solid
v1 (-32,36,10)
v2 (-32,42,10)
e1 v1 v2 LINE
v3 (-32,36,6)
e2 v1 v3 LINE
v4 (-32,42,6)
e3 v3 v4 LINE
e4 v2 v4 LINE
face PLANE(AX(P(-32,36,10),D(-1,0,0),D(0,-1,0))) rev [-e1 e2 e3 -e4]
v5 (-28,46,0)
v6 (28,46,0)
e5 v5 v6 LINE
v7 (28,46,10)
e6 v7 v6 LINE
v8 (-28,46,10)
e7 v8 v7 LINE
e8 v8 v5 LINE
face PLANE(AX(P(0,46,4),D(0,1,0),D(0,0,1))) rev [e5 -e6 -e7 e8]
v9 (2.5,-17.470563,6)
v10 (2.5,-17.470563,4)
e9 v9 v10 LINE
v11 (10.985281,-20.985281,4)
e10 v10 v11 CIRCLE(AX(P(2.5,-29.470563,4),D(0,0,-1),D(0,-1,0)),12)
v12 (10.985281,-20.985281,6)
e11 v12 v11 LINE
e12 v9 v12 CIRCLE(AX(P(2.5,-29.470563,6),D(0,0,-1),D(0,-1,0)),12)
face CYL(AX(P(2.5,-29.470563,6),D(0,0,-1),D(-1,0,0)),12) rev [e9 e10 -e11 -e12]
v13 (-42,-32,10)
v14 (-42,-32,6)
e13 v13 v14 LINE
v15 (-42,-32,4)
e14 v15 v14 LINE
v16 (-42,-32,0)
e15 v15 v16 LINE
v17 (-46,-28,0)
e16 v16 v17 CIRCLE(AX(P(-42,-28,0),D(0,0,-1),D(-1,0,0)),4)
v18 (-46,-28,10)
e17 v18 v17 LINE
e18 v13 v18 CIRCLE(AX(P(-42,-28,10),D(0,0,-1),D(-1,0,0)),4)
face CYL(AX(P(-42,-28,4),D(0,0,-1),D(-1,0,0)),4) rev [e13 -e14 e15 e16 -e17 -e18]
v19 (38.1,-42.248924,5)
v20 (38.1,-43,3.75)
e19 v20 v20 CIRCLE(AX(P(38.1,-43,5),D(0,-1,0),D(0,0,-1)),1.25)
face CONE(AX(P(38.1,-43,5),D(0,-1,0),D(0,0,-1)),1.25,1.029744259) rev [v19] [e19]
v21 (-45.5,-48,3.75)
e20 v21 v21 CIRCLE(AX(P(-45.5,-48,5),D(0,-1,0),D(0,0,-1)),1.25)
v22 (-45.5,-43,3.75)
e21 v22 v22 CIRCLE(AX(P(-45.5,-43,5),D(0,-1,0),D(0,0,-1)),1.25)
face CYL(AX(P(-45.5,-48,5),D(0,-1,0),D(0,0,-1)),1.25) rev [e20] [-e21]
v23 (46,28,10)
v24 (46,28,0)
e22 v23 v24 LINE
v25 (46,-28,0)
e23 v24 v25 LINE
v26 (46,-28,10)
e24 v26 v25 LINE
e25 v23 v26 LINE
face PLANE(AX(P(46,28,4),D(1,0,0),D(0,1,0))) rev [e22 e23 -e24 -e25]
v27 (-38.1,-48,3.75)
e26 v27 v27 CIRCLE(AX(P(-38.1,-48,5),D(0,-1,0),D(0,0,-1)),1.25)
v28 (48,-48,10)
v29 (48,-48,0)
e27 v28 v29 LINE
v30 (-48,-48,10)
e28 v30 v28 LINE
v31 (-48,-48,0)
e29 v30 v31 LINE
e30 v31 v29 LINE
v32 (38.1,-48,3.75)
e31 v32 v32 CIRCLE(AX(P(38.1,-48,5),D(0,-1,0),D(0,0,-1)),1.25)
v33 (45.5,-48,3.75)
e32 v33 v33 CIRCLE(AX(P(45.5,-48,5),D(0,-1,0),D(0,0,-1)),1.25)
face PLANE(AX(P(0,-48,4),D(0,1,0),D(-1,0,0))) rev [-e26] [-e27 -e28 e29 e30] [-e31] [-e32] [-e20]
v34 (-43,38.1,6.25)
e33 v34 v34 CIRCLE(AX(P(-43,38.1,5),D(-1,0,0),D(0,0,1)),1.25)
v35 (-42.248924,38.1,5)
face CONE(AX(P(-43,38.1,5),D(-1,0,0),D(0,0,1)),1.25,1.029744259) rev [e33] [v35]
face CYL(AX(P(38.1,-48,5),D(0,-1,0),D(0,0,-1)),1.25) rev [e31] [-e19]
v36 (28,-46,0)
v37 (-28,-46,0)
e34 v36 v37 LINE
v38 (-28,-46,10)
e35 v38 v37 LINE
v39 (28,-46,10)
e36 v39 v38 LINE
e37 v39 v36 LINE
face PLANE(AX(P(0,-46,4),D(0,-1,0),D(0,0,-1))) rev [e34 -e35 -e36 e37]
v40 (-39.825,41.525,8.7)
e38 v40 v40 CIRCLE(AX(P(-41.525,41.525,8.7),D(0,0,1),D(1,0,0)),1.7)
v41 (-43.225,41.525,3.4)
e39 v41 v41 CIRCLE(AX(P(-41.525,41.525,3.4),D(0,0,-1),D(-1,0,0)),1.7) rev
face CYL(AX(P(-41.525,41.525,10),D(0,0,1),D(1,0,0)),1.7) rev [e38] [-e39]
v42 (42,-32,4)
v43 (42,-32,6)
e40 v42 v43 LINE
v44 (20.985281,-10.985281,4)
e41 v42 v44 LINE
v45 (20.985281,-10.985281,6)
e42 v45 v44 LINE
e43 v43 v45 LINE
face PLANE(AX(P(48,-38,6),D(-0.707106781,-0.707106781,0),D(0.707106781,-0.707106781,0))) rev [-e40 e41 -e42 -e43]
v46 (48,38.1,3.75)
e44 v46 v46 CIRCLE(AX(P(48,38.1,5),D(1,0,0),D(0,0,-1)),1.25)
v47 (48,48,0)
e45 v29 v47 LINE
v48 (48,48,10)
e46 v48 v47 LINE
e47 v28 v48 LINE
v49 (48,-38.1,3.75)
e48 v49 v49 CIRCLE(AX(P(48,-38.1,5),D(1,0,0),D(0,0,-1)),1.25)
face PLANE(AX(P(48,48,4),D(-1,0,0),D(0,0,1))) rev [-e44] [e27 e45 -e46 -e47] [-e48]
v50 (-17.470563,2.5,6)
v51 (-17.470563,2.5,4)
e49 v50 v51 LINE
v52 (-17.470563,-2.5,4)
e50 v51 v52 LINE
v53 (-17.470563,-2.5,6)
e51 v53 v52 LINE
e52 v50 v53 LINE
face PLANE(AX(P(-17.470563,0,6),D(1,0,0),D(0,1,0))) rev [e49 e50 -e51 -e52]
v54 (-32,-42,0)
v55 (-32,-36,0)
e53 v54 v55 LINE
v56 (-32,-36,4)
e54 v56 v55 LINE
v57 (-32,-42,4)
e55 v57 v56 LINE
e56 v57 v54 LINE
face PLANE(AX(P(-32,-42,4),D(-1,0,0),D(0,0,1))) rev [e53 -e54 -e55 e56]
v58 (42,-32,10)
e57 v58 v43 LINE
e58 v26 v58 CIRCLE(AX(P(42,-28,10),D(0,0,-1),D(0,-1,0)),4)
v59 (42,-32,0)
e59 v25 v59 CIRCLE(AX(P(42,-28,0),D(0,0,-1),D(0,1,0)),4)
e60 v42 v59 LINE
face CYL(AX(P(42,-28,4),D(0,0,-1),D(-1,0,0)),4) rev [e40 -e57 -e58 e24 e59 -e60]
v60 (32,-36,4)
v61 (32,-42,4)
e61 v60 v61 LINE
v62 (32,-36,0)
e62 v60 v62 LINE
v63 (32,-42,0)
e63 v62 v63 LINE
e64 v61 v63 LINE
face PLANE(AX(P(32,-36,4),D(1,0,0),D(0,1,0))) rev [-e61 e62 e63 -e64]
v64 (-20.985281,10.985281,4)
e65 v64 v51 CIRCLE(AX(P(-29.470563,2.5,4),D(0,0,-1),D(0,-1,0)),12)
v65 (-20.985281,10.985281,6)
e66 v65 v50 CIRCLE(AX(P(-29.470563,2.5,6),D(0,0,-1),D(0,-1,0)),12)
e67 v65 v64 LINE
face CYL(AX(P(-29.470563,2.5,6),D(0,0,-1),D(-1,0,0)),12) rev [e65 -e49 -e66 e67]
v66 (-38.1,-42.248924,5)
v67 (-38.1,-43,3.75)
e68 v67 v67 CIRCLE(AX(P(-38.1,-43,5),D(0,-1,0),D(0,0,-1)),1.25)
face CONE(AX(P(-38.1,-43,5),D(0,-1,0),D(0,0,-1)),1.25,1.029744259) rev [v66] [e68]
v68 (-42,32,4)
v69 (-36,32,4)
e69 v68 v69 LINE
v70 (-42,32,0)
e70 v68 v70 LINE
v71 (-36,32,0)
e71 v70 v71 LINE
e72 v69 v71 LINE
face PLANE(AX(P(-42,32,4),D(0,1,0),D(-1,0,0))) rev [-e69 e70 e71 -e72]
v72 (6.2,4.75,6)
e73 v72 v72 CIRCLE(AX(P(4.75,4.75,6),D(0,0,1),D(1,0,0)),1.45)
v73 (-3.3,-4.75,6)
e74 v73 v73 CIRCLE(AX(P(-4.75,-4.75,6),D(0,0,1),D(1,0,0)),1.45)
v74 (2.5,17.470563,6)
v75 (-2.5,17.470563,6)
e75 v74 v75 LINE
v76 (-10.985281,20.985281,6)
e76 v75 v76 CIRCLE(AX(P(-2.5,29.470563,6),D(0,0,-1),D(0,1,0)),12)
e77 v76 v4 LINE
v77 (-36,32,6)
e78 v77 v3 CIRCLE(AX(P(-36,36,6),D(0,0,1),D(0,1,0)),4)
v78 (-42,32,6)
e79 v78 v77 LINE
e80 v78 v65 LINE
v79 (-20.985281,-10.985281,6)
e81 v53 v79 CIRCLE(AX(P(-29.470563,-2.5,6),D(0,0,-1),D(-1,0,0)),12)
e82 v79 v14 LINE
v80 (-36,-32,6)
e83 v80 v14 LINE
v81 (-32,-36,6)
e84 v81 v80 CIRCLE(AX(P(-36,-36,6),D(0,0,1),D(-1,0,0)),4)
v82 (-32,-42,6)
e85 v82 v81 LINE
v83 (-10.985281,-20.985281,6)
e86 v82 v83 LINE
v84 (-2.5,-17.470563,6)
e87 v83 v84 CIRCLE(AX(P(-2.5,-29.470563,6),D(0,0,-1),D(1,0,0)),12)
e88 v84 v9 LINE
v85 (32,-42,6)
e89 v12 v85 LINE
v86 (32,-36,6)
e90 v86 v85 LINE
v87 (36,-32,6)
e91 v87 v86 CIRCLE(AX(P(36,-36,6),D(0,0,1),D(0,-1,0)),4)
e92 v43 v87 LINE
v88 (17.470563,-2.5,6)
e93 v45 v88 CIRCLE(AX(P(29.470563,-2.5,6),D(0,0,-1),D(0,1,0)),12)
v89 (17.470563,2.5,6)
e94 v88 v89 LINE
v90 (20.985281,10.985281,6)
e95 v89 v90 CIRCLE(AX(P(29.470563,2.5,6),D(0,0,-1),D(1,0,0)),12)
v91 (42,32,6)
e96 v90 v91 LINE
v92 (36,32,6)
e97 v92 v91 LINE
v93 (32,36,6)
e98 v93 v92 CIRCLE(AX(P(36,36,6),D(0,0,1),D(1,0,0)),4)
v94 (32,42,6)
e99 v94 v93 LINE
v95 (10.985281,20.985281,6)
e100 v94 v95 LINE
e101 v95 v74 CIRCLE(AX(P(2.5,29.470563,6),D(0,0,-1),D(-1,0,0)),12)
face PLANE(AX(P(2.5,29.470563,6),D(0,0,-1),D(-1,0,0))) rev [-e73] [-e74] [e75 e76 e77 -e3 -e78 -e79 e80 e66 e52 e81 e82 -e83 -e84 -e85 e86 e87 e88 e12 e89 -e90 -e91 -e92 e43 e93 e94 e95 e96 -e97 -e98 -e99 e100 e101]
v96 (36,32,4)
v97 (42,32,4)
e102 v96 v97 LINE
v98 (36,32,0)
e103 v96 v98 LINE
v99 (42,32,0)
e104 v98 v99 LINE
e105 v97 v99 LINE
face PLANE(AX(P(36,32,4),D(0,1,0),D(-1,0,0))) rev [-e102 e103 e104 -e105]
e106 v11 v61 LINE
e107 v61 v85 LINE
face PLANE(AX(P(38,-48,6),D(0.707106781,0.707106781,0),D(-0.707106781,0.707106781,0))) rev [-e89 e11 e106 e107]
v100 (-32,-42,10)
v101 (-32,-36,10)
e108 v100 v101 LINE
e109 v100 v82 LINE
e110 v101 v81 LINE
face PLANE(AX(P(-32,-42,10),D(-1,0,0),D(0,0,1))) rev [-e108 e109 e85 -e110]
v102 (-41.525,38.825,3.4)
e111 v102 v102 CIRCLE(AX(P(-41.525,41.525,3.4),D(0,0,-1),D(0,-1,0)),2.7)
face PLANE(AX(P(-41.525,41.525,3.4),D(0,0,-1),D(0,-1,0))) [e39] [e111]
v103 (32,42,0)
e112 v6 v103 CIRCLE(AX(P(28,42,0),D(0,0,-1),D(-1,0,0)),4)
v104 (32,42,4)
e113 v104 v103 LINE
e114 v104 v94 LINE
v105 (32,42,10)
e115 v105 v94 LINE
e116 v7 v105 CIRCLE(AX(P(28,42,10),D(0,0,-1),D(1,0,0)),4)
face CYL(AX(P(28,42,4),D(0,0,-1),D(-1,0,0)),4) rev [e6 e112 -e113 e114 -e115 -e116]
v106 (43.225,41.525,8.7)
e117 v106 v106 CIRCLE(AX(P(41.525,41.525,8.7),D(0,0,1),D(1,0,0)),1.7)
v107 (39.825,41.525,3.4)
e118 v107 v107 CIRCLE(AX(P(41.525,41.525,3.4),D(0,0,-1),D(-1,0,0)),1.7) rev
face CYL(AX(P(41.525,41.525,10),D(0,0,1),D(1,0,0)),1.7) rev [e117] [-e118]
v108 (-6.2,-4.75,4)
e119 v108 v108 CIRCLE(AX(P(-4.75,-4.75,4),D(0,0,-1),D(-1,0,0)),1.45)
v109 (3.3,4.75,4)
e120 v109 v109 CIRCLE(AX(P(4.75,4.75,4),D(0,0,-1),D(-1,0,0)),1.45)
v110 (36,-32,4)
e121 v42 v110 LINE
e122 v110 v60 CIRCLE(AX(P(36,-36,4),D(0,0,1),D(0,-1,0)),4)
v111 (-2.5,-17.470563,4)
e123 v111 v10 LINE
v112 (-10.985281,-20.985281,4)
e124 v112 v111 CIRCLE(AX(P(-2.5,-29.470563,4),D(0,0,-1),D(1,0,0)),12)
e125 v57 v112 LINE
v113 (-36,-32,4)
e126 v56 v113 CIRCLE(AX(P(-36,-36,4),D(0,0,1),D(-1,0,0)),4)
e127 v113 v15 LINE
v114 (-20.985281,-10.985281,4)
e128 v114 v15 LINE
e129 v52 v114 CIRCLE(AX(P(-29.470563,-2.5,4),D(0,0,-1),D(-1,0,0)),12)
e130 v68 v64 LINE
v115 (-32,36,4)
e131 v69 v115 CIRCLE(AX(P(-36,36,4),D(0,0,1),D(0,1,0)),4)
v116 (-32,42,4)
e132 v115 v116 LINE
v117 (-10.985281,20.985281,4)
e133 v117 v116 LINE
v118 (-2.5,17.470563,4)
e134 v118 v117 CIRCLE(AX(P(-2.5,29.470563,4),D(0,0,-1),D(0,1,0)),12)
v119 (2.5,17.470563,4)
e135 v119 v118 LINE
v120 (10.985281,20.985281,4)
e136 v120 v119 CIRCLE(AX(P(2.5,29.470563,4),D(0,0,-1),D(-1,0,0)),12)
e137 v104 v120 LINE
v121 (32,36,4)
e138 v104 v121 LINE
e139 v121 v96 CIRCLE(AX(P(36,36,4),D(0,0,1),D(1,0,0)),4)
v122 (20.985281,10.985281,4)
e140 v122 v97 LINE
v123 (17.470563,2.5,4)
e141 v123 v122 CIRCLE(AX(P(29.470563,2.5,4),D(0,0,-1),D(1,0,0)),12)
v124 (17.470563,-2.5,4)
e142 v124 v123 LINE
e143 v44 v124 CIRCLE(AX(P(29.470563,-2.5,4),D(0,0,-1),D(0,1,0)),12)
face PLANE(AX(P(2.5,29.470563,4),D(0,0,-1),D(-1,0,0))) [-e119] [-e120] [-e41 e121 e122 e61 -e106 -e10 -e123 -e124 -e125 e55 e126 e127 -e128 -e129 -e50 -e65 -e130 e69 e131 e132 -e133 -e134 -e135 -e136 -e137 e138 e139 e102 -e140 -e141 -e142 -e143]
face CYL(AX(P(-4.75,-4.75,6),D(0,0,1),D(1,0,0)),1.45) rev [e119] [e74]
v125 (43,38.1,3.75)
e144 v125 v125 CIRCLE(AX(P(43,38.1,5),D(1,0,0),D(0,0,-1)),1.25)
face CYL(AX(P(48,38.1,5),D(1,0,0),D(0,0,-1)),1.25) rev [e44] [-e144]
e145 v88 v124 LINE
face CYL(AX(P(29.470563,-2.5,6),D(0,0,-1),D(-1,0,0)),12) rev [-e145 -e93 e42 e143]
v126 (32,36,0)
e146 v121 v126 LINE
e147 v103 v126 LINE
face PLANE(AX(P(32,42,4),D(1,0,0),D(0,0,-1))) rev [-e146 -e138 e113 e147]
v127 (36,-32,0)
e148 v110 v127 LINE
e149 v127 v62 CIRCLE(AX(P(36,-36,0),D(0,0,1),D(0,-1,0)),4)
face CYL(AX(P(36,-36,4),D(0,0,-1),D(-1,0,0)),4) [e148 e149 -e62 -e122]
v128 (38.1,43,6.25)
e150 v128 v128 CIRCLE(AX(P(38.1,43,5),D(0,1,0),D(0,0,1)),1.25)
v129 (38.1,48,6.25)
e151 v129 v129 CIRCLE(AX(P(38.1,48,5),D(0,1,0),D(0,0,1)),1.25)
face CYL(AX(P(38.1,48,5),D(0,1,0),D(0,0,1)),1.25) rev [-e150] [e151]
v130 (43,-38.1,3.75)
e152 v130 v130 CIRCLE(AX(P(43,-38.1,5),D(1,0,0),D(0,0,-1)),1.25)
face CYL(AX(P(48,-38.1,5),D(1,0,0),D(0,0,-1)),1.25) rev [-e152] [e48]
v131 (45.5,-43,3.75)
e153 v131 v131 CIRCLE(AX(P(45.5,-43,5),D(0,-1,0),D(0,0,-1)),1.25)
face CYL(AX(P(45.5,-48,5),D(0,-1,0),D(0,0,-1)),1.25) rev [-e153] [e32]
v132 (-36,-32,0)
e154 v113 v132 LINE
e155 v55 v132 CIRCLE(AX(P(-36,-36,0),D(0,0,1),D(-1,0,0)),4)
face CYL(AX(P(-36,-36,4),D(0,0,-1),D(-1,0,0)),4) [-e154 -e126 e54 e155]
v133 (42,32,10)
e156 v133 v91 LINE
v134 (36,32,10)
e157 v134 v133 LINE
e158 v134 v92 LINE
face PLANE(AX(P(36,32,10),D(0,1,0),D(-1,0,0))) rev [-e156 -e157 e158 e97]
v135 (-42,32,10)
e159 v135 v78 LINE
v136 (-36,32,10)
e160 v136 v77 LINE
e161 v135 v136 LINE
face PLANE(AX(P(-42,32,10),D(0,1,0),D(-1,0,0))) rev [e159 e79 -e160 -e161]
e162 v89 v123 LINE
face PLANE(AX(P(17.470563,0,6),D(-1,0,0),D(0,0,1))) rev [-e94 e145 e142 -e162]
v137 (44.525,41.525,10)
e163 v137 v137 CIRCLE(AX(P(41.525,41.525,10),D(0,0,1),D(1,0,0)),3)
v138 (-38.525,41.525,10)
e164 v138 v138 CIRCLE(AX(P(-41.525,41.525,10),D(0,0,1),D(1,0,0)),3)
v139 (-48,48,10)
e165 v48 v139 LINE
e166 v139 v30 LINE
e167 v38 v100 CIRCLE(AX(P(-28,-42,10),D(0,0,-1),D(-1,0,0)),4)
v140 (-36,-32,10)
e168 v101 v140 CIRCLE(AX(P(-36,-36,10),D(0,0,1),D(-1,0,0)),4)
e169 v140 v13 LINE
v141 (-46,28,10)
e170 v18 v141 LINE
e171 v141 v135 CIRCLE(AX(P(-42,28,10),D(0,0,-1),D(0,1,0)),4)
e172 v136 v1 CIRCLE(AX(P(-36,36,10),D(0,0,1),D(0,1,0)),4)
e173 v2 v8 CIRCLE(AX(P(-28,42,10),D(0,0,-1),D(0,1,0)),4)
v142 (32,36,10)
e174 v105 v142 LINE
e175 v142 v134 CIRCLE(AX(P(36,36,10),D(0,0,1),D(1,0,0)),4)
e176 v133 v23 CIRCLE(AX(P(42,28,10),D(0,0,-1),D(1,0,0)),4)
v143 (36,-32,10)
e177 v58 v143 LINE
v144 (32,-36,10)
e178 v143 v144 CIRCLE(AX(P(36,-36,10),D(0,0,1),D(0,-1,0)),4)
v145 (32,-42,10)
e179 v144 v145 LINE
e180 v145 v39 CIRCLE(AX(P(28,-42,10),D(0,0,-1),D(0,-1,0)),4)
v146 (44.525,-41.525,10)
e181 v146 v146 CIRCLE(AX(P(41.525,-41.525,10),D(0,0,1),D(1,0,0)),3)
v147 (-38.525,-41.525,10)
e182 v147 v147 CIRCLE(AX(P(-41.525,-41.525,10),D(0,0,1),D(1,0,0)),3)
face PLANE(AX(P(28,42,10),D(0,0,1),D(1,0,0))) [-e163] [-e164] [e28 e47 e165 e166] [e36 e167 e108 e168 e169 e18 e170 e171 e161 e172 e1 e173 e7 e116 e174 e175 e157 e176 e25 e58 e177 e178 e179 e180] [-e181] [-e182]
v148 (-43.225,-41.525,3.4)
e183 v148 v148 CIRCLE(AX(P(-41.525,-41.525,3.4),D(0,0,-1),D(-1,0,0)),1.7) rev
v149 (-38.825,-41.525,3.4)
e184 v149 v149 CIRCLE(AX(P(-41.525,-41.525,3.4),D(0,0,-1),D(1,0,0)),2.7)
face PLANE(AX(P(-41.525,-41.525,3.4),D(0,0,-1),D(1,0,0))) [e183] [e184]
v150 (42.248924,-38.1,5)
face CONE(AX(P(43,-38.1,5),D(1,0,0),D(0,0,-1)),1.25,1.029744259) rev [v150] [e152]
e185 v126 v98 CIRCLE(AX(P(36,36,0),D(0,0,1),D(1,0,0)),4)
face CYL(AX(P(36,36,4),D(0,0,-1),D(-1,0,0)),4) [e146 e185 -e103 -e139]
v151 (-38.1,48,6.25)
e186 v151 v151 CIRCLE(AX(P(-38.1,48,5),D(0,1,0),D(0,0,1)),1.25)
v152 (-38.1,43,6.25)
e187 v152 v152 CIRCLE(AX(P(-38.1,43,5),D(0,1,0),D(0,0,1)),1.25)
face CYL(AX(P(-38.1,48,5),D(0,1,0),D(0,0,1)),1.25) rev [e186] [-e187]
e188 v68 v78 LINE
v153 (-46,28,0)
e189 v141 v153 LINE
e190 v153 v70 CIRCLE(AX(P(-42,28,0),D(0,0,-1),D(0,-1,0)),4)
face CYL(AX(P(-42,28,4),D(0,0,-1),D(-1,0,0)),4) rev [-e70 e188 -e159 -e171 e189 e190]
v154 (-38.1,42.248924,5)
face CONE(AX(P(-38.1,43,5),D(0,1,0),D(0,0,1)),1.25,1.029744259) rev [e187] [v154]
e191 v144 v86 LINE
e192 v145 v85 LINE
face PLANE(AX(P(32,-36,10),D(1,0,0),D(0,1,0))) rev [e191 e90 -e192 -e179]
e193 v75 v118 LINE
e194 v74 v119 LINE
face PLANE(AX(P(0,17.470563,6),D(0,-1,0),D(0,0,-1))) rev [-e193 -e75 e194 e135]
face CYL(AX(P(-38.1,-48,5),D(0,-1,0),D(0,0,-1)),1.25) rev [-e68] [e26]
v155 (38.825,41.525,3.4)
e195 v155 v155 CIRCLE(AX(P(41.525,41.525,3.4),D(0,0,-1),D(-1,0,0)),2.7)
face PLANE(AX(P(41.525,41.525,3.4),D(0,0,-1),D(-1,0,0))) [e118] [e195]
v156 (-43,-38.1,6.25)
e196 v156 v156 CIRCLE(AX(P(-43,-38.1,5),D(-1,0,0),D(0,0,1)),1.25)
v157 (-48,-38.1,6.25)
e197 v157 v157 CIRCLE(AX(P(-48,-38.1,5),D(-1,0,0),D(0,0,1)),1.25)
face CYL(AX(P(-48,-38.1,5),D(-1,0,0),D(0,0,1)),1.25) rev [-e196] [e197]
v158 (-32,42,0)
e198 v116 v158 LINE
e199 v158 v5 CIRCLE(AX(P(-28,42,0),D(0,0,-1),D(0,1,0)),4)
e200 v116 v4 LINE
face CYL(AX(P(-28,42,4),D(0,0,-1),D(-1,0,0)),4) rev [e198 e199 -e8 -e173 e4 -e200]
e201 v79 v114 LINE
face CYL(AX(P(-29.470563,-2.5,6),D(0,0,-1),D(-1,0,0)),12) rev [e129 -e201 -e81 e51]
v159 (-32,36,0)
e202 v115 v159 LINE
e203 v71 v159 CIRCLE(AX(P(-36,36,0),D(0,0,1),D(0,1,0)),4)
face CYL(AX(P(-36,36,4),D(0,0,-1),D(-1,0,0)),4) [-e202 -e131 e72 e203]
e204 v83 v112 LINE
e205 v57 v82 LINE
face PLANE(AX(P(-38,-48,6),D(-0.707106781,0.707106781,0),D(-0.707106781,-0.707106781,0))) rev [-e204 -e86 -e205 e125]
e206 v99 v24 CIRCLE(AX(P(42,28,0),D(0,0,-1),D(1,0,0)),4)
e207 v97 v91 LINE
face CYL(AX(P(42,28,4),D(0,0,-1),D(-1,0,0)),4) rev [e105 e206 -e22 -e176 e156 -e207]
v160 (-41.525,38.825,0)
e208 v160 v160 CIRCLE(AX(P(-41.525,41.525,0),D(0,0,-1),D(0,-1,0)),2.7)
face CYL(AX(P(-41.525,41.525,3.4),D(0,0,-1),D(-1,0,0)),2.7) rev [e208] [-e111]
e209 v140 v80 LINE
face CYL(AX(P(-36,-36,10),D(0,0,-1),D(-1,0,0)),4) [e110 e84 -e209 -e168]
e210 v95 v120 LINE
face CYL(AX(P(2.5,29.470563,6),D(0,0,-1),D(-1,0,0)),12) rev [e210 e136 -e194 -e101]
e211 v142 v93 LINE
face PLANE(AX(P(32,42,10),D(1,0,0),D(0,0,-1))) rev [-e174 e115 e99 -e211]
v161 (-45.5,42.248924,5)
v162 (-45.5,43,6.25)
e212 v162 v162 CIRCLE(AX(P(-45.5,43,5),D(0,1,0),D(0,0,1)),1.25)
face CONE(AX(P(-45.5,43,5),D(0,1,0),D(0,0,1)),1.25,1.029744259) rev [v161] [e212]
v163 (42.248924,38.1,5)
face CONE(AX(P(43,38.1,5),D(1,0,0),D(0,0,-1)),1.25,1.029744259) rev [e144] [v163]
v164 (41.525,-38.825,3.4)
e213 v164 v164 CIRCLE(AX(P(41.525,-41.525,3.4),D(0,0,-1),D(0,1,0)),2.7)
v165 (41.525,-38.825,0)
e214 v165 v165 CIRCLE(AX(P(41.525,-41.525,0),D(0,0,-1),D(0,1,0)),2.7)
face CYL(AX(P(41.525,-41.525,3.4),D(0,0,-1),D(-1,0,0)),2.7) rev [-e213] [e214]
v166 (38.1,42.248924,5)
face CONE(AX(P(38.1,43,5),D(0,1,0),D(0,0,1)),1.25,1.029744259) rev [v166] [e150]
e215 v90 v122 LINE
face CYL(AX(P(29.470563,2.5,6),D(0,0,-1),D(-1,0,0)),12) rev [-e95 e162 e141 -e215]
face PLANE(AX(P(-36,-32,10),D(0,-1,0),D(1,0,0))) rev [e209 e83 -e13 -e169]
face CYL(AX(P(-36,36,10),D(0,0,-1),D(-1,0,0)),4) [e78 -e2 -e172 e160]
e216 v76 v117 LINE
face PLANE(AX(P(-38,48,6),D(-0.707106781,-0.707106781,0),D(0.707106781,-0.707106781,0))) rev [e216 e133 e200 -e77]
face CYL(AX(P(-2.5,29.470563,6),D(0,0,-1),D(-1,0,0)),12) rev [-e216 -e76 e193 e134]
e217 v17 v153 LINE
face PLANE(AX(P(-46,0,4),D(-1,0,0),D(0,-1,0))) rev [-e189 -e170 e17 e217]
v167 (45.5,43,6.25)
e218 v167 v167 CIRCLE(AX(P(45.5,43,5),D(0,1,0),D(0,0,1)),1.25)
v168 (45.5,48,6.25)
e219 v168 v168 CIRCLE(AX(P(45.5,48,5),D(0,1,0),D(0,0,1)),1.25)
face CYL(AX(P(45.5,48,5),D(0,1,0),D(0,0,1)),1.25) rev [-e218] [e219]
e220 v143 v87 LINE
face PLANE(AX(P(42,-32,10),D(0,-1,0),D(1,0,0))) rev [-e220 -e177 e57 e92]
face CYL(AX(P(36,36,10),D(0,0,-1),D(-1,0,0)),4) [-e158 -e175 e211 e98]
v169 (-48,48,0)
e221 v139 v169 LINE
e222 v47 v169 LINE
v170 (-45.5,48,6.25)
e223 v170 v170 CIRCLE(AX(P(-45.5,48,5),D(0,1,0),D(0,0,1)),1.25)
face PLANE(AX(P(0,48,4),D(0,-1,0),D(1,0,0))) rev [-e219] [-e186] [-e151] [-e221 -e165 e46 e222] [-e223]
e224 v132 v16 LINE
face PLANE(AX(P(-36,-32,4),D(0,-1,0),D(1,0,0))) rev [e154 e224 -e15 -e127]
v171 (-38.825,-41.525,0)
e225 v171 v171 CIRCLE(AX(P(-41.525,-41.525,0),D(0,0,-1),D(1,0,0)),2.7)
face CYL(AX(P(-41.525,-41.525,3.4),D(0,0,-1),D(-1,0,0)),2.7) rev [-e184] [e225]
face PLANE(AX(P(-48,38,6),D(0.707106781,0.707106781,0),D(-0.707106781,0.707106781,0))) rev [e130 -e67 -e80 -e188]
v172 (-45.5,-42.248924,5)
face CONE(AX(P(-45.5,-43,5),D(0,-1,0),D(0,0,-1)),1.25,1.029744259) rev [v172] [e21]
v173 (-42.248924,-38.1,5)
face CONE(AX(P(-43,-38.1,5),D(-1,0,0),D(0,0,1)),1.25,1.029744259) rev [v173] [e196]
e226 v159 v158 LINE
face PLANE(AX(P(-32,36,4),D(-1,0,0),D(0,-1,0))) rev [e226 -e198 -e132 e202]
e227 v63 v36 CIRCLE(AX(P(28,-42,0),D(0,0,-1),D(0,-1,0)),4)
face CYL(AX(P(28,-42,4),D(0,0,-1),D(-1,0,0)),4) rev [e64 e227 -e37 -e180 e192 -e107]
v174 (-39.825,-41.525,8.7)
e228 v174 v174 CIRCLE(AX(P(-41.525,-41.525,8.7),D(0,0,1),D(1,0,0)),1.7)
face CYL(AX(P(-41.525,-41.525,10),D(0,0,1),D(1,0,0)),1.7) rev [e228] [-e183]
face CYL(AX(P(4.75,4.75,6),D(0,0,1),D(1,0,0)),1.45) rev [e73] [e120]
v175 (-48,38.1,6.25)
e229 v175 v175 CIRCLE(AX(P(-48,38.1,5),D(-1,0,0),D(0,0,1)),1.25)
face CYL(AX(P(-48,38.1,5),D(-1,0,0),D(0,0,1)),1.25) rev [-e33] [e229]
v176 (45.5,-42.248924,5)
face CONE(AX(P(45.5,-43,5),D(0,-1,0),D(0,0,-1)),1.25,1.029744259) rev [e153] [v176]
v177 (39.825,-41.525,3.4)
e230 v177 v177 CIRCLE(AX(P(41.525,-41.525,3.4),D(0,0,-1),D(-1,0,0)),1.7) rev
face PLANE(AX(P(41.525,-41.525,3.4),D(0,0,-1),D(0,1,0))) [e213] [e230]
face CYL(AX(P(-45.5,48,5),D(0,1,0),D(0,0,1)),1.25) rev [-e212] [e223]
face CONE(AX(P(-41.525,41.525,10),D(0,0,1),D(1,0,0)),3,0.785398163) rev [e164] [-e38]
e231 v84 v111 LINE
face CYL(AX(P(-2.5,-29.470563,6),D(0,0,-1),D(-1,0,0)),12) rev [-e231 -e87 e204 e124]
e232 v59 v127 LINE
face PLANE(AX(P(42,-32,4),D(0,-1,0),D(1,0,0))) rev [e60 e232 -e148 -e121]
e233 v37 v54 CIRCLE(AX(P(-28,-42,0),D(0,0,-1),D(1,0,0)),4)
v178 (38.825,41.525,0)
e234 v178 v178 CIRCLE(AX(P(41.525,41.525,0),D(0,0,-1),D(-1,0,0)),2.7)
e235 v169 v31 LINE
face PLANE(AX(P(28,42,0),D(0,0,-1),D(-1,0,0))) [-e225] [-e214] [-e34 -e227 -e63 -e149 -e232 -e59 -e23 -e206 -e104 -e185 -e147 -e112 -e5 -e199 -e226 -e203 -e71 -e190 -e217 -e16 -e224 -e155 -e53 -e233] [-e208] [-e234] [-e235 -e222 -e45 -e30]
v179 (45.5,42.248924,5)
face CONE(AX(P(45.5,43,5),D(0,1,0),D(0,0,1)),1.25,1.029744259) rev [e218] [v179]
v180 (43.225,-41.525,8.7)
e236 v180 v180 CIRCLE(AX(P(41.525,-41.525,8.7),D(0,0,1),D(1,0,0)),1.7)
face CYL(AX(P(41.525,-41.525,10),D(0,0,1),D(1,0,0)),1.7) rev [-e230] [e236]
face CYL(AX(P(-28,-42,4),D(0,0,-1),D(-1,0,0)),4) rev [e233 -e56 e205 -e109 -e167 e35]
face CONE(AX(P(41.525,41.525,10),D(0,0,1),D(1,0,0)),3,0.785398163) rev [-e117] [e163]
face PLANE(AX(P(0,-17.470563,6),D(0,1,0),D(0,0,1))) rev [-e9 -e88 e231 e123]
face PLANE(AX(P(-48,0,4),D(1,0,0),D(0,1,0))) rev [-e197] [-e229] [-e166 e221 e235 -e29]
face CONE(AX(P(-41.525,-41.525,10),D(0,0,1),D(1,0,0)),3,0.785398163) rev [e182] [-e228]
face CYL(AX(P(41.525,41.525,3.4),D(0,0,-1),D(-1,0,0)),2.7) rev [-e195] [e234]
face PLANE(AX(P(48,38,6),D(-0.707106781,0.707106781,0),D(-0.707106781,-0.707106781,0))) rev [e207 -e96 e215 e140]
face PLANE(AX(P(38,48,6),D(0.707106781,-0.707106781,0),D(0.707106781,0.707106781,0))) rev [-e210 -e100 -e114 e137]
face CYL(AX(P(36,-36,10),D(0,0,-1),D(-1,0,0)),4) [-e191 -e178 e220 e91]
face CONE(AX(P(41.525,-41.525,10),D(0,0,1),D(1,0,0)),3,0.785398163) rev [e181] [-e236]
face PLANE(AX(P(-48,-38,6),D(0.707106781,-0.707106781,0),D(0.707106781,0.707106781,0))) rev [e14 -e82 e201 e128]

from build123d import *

# Parameters (mm, degrees)
BOTTOMLAYER_DEPTH              = 4
MIDDLELAYER_DEPTH              = 2
FILLUPLAYER_START              = -2
FILLUPLAYER_DEPTH              = 2
TOPLAYER_DEPTH                 = 4
M3_CLEARANCE_HOLE1_D           = 3.4
M3_CLEARANCE_HOLE1_CSINK_D     = 6
M3_CLEARANCE_HOLE1_CSINK_ANGLE = 90
M2_5_CLEARANCE_HOLE1_D         = 2.9
CIRPATTERN1_COUNT              = 4
SKETCH30_R                     = 2.7
CUT_EXTRUDE1_DEPTH             = 3.4
CIRPATTERN2_COUNT              = 4


with BuildPart() as part:
    # Sketch3 → BottomLayer (new body)
    with BuildSketch(Plane.XY):
        with BuildLine():
            Line((0, 48), (48, 48))
            Line((48, 48), (48, 0))
            Line((48, 0), (46, 0))
            Line((46, 0), (46, 28))
            ThreePointArc((46, 28), (44.828427125, 30.828427125), (42, 32))
            Line((42, 32), (36, 32))
            ThreePointArc((36, 32), (33.171572875, 33.171572875), (32, 36))
            Line((32, 36), (32, 42))
            ThreePointArc((32, 42), (30.828427125, 44.828427125), (28, 46))
            Line((28, 46), (0, 46))
            Line((0, 46), (0, 48))
        make_face()
    bottomlayer = extrude(amount=BOTTOMLAYER_DEPTH)

    # Sketch6 → MiddleLayer (add)
    with BuildSketch(Plane.XY.offset(4)):
        with BuildLine():
            Line((0, 17.470562748), (0, 0))
            Line((0, 0), (17.470562748, 0))
            Line((17.470562748, 0), (17.470562748, 2.5))
            ThreePointArc((17.470562748, 2.5), (18.384008358, 7.092201188), (20.985281374, 10.985281374))
            Line((20.985281374, 10.985281374), (48, 38))
            Line((48, 38), (48, 48))
            Line((48, 48), (38, 48))
            Line((38, 48), (10.985281374, 20.985281374))
            ThreePointArc((10.985281374, 20.985281374), (7.092201188, 18.384008358), (2.5, 17.470562748))
            Line((2.5, 17.470562748), (0, 17.470562748))
        make_face()
    middlelayer = extrude(amount=MIDDLELAYER_DEPTH)

    # Sketch10 → FillUpLayer (add)
    with BuildSketch(Plane.XY.offset(6).offset(FILLUPLAYER_START)):
        with BuildLine():
            Line((48, 48), (0, 48))
            Line((0, 48), (0, 46))
            Line((0, 46), (28, 46))
            ThreePointArc((28, 46), (30.828427125, 44.828427125), (32, 42))
            Line((32, 42), (32, 36))
            ThreePointArc((32, 36), (33.171572875, 33.171572875), (36, 32))
            Line((36, 32), (42, 32))
            ThreePointArc((42, 32), (44.828427125, 30.828427125), (46, 28))
            Line((46, 28), (46, 0))
            Line((46, 0), (48, 0))
            Line((48, 0), (48, 48))
        make_face()
    filluplayer = extrude(amount=FILLUPLAYER_DEPTH)

    # Sketch11 → TopLayer (add)
    with BuildSketch(Plane.XY.offset(6)):
        with BuildLine():
            Line((48, 48), (0, 48))
            Line((0, 48), (0, 46))
            Line((0, 46), (28, 46))
            ThreePointArc((28, 46), (30.828427125, 44.828427125), (32, 42))
            Line((32, 42), (32, 36))
            ThreePointArc((32, 36), (33.171572875, 33.171572875), (36, 32))
            Line((36, 32), (42, 32))
            ThreePointArc((42, 32), (44.828427125, 30.828427125), (46, 28))
            Line((46, 28), (46, 0))
            Line((46, 0), (48, 0))
            Line((48, 0), (48, 48))
        make_face()
    toplayer = extrude(amount=TOPLAYER_DEPTH)

    # M3 Clearance Hole1 (through all)
    with Locations(Plane.XY.offset(10)):
        with Locations((41.525, 41.525)):
            m3_clearance_hole1 = CounterSinkHole(M3_CLEARANCE_HOLE1_D / 2, M3_CLEARANCE_HOLE1_CSINK_D / 2, counter_sink_angle=M3_CLEARANCE_HOLE1_CSINK_ANGLE)

    # M2.5 Clearance Hole1 (through all)
    with Locations(Plane.XY.offset(6)):
        with Locations((4.75, 4.75)):
            m2_5_clearance_hole1 = Hole(M2_5_CLEARANCE_HOLE1_D / 2)

    # CirPattern1: BottomLayer, MiddleLayer, FillUpLayer, TopLayer, M3 Clearance Hole1 ×4 about axis
    cirpattern1_axis = Axis((0, 0, -0.5), (0, 0, 1))
    add([bottomlayer.rotate(cirpattern1_axis, i * 360 / CIRPATTERN1_COUNT) for i in range(1, CIRPATTERN1_COUNT)])
    add([middlelayer.rotate(cirpattern1_axis, i * 360 / CIRPATTERN1_COUNT) for i in range(1, CIRPATTERN1_COUNT)])
    add([filluplayer.rotate(cirpattern1_axis, i * 360 / CIRPATTERN1_COUNT) for i in range(1, CIRPATTERN1_COUNT)])
    add([toplayer.rotate(cirpattern1_axis, i * 360 / CIRPATTERN1_COUNT) for i in range(1, CIRPATTERN1_COUNT)])
    add([m3_clearance_hole1.rotate(cirpattern1_axis, i * 360 / CIRPATTERN1_COUNT) for i in range(1, CIRPATTERN1_COUNT)], mode=Mode.SUBTRACT)

    # Sketch21 → Tap Drill M3 Side Plate (revolve, cut)
    with BuildSketch(Plane(origin=(48, 38.1, 5), x_dir=(0, 0, -1), z_dir=(0, 1, 0))):
        Polygon((0, 0), (0, 5.751075774), (1.25, 5), (1.25, 0), align=None)
    tap_drill_m3_side_plate = revolve(axis=Axis((54.35, 38.1, 5), (-1, 0, 0)), mode=Mode.SUBTRACT)

    # Camera Holes: M2.5 Clearance Hole1 across plane
    add(m2_5_clearance_hole1.mirror(Plane(origin=(0, 0, 0), x_dir=(0, 0, 1), z_dir=(-0.7071067811865476, -0.7071067811865476, 0))), mode=Mode.SUBTRACT)

    # Sketch27 → Tap Drill M3 Side Plate 2 (revolve, cut)
    with BuildSketch(Plane(origin=(38.1, 48, 5), x_dir=(0, 0, 1), z_dir=(1, 0, 0))):
        Polygon((0, 0), (0, 5.751075774), (1.25, 5), (1.25, 0), align=None)
    tap_drill_m3_side_plate_2 = revolve(axis=Axis((38.1, 54.35, 5), (0, -1, 0)), mode=Mode.SUBTRACT)

    # Sketch29 → Tap Drill M3 Rail (revolve, cut)
    with BuildSketch(Plane(origin=(45.5, 48, 5), x_dir=(0, 0, 1), z_dir=(1, 0, 0))):
        Polygon((0, 0), (0, 5.751075774), (1.25, 5), (1.25, 0), align=None)
    tap_drill_m3_rail = revolve(axis=Axis((45.5, 54.35, 5), (0, -1, 0)), mode=Mode.SUBTRACT)

    # SidePlate and Rail Holes 1: Tap Drill M3 Side Plate, Tap Drill M3 Side Plate 2, Tap Drill M3 Rail across plane
    add(tap_drill_m3_side_plate.mirror(Plane(origin=(0, 0, 0), x_dir=(0, 0, 1), z_dir=(1, 0, 0))), mode=Mode.SUBTRACT)
    add(tap_drill_m3_side_plate_2.mirror(Plane(origin=(0, 0, 0), x_dir=(0, 0, 1), z_dir=(1, 0, 0))), mode=Mode.SUBTRACT)
    add(tap_drill_m3_rail.mirror(Plane(origin=(0, 0, 0), x_dir=(0, 0, 1), z_dir=(1, 0, 0))), mode=Mode.SUBTRACT)

    # Side Plate and Rail Holes 2 copy 1 sketc → Side Plate and Rail Holes 2 copy 1 (revolve, cut)
    with BuildSketch(Plane(origin=(-48, -38.1, 5), x_dir=(0, 0, -1), z_dir=(0, -1, 0))):
        Polygon((0, 0), (0, 5.751075774), (1.25, 5), (1.25, 0), align=None)
    revolve(axis=Axis((-54.35, -38.1, 5), (1, 0, 0)), mode=Mode.SUBTRACT)

    # Side Plate and Rail Holes 2 copy 2 sketc → Side Plate and Rail Holes 2 copy 2 (revolve, cut)
    with BuildSketch(Plane(origin=(-38.1, -48, 5), x_dir=(0, 0, 1), z_dir=(-1, 0, 0))):
        Polygon((0, 0), (0, 5.751075774), (1.25, 5), (1.25, 0), align=None)
    revolve(axis=Axis((-38.1, -54.35, 5), (0, 1, 0)), mode=Mode.SUBTRACT)

    # Side Plate and Rail Holes 2 copy 3 sketc → Side Plate and Rail Holes 2 copy 3 (revolve, cut)
    with BuildSketch(Plane(origin=(-45.5, -48, 5), x_dir=(0, 0, 1), z_dir=(-1, 0, 0))):
        Polygon((0, 0), (0, 5.751075774), (1.25, 5), (1.25, 0), align=None)
    revolve(axis=Axis((-45.5, -54.35, 5), (0, 1, 0)), mode=Mode.SUBTRACT)

    # Side Plate and Rail Holes 2 copy 4 sketc → Side Plate and Rail Holes 2 copy 4 (revolve, cut)
    with BuildSketch(Plane(origin=(48, -38.1, 5), x_dir=(0, 0, -1), z_dir=(0, -1, 0))):
        Polygon((0, 0), (0, -5.751075774), (1.25, -5), (1.25, 0), align=None)
    revolve(axis=Axis((54.35, -38.1, 5), (1, 0, 0)), mode=Mode.SUBTRACT)

    # Side Plate and Rail Holes 2 copy 5 sketc → Side Plate and Rail Holes 2 copy 5 (revolve, cut)
    with BuildSketch(Plane(origin=(38.1, -48, 5), x_dir=(0, 0, 1), z_dir=(1, 0, 0))):
        Polygon((0, 0), (0, -5.751075774), (1.25, -5), (1.25, 0), align=None)
    revolve(axis=Axis((38.1, -54.35, 5), (0, -1, 0)), mode=Mode.SUBTRACT)

    # Side Plate and Rail Holes 2 copy 6 sketc → Side Plate and Rail Holes 2 copy 6 (revolve, cut)
    with BuildSketch(Plane(origin=(45.5, -48, 5), x_dir=(0, 0, 1), z_dir=(1, 0, 0))):
        Polygon((0, 0), (0, -5.751075774), (1.25, -5), (1.25, 0), align=None)
    revolve(axis=Axis((45.5, -54.35, 5), (0, -1, 0)), mode=Mode.SUBTRACT)

    # Sketch30 → Cut-Extrude1 (cut)
    with BuildSketch(Plane(origin=(0, 0, 0), x_dir=(-1, 0, 0), z_dir=(0, 0, -1))):
        with Locations((-41.525, 41.525)):
            Circle(SKETCH30_R)
    cut_extrude1 = extrude(amount=-CUT_EXTRUDE1_DEPTH, mode=Mode.SUBTRACT)

    # CirPattern2: Cut-Extrude1 ×4 about axis
    cirpattern2_axis = Axis((0, 0, -0.5), (0, 0, 1))
    for i in range(1, CIRPATTERN2_COUNT):
        add(cut_extrude1.rotate(cirpattern2_axis, i * 360 / CIRPATTERN2_COUNT), mode=Mode.SUBTRACT)


solid = part.part
